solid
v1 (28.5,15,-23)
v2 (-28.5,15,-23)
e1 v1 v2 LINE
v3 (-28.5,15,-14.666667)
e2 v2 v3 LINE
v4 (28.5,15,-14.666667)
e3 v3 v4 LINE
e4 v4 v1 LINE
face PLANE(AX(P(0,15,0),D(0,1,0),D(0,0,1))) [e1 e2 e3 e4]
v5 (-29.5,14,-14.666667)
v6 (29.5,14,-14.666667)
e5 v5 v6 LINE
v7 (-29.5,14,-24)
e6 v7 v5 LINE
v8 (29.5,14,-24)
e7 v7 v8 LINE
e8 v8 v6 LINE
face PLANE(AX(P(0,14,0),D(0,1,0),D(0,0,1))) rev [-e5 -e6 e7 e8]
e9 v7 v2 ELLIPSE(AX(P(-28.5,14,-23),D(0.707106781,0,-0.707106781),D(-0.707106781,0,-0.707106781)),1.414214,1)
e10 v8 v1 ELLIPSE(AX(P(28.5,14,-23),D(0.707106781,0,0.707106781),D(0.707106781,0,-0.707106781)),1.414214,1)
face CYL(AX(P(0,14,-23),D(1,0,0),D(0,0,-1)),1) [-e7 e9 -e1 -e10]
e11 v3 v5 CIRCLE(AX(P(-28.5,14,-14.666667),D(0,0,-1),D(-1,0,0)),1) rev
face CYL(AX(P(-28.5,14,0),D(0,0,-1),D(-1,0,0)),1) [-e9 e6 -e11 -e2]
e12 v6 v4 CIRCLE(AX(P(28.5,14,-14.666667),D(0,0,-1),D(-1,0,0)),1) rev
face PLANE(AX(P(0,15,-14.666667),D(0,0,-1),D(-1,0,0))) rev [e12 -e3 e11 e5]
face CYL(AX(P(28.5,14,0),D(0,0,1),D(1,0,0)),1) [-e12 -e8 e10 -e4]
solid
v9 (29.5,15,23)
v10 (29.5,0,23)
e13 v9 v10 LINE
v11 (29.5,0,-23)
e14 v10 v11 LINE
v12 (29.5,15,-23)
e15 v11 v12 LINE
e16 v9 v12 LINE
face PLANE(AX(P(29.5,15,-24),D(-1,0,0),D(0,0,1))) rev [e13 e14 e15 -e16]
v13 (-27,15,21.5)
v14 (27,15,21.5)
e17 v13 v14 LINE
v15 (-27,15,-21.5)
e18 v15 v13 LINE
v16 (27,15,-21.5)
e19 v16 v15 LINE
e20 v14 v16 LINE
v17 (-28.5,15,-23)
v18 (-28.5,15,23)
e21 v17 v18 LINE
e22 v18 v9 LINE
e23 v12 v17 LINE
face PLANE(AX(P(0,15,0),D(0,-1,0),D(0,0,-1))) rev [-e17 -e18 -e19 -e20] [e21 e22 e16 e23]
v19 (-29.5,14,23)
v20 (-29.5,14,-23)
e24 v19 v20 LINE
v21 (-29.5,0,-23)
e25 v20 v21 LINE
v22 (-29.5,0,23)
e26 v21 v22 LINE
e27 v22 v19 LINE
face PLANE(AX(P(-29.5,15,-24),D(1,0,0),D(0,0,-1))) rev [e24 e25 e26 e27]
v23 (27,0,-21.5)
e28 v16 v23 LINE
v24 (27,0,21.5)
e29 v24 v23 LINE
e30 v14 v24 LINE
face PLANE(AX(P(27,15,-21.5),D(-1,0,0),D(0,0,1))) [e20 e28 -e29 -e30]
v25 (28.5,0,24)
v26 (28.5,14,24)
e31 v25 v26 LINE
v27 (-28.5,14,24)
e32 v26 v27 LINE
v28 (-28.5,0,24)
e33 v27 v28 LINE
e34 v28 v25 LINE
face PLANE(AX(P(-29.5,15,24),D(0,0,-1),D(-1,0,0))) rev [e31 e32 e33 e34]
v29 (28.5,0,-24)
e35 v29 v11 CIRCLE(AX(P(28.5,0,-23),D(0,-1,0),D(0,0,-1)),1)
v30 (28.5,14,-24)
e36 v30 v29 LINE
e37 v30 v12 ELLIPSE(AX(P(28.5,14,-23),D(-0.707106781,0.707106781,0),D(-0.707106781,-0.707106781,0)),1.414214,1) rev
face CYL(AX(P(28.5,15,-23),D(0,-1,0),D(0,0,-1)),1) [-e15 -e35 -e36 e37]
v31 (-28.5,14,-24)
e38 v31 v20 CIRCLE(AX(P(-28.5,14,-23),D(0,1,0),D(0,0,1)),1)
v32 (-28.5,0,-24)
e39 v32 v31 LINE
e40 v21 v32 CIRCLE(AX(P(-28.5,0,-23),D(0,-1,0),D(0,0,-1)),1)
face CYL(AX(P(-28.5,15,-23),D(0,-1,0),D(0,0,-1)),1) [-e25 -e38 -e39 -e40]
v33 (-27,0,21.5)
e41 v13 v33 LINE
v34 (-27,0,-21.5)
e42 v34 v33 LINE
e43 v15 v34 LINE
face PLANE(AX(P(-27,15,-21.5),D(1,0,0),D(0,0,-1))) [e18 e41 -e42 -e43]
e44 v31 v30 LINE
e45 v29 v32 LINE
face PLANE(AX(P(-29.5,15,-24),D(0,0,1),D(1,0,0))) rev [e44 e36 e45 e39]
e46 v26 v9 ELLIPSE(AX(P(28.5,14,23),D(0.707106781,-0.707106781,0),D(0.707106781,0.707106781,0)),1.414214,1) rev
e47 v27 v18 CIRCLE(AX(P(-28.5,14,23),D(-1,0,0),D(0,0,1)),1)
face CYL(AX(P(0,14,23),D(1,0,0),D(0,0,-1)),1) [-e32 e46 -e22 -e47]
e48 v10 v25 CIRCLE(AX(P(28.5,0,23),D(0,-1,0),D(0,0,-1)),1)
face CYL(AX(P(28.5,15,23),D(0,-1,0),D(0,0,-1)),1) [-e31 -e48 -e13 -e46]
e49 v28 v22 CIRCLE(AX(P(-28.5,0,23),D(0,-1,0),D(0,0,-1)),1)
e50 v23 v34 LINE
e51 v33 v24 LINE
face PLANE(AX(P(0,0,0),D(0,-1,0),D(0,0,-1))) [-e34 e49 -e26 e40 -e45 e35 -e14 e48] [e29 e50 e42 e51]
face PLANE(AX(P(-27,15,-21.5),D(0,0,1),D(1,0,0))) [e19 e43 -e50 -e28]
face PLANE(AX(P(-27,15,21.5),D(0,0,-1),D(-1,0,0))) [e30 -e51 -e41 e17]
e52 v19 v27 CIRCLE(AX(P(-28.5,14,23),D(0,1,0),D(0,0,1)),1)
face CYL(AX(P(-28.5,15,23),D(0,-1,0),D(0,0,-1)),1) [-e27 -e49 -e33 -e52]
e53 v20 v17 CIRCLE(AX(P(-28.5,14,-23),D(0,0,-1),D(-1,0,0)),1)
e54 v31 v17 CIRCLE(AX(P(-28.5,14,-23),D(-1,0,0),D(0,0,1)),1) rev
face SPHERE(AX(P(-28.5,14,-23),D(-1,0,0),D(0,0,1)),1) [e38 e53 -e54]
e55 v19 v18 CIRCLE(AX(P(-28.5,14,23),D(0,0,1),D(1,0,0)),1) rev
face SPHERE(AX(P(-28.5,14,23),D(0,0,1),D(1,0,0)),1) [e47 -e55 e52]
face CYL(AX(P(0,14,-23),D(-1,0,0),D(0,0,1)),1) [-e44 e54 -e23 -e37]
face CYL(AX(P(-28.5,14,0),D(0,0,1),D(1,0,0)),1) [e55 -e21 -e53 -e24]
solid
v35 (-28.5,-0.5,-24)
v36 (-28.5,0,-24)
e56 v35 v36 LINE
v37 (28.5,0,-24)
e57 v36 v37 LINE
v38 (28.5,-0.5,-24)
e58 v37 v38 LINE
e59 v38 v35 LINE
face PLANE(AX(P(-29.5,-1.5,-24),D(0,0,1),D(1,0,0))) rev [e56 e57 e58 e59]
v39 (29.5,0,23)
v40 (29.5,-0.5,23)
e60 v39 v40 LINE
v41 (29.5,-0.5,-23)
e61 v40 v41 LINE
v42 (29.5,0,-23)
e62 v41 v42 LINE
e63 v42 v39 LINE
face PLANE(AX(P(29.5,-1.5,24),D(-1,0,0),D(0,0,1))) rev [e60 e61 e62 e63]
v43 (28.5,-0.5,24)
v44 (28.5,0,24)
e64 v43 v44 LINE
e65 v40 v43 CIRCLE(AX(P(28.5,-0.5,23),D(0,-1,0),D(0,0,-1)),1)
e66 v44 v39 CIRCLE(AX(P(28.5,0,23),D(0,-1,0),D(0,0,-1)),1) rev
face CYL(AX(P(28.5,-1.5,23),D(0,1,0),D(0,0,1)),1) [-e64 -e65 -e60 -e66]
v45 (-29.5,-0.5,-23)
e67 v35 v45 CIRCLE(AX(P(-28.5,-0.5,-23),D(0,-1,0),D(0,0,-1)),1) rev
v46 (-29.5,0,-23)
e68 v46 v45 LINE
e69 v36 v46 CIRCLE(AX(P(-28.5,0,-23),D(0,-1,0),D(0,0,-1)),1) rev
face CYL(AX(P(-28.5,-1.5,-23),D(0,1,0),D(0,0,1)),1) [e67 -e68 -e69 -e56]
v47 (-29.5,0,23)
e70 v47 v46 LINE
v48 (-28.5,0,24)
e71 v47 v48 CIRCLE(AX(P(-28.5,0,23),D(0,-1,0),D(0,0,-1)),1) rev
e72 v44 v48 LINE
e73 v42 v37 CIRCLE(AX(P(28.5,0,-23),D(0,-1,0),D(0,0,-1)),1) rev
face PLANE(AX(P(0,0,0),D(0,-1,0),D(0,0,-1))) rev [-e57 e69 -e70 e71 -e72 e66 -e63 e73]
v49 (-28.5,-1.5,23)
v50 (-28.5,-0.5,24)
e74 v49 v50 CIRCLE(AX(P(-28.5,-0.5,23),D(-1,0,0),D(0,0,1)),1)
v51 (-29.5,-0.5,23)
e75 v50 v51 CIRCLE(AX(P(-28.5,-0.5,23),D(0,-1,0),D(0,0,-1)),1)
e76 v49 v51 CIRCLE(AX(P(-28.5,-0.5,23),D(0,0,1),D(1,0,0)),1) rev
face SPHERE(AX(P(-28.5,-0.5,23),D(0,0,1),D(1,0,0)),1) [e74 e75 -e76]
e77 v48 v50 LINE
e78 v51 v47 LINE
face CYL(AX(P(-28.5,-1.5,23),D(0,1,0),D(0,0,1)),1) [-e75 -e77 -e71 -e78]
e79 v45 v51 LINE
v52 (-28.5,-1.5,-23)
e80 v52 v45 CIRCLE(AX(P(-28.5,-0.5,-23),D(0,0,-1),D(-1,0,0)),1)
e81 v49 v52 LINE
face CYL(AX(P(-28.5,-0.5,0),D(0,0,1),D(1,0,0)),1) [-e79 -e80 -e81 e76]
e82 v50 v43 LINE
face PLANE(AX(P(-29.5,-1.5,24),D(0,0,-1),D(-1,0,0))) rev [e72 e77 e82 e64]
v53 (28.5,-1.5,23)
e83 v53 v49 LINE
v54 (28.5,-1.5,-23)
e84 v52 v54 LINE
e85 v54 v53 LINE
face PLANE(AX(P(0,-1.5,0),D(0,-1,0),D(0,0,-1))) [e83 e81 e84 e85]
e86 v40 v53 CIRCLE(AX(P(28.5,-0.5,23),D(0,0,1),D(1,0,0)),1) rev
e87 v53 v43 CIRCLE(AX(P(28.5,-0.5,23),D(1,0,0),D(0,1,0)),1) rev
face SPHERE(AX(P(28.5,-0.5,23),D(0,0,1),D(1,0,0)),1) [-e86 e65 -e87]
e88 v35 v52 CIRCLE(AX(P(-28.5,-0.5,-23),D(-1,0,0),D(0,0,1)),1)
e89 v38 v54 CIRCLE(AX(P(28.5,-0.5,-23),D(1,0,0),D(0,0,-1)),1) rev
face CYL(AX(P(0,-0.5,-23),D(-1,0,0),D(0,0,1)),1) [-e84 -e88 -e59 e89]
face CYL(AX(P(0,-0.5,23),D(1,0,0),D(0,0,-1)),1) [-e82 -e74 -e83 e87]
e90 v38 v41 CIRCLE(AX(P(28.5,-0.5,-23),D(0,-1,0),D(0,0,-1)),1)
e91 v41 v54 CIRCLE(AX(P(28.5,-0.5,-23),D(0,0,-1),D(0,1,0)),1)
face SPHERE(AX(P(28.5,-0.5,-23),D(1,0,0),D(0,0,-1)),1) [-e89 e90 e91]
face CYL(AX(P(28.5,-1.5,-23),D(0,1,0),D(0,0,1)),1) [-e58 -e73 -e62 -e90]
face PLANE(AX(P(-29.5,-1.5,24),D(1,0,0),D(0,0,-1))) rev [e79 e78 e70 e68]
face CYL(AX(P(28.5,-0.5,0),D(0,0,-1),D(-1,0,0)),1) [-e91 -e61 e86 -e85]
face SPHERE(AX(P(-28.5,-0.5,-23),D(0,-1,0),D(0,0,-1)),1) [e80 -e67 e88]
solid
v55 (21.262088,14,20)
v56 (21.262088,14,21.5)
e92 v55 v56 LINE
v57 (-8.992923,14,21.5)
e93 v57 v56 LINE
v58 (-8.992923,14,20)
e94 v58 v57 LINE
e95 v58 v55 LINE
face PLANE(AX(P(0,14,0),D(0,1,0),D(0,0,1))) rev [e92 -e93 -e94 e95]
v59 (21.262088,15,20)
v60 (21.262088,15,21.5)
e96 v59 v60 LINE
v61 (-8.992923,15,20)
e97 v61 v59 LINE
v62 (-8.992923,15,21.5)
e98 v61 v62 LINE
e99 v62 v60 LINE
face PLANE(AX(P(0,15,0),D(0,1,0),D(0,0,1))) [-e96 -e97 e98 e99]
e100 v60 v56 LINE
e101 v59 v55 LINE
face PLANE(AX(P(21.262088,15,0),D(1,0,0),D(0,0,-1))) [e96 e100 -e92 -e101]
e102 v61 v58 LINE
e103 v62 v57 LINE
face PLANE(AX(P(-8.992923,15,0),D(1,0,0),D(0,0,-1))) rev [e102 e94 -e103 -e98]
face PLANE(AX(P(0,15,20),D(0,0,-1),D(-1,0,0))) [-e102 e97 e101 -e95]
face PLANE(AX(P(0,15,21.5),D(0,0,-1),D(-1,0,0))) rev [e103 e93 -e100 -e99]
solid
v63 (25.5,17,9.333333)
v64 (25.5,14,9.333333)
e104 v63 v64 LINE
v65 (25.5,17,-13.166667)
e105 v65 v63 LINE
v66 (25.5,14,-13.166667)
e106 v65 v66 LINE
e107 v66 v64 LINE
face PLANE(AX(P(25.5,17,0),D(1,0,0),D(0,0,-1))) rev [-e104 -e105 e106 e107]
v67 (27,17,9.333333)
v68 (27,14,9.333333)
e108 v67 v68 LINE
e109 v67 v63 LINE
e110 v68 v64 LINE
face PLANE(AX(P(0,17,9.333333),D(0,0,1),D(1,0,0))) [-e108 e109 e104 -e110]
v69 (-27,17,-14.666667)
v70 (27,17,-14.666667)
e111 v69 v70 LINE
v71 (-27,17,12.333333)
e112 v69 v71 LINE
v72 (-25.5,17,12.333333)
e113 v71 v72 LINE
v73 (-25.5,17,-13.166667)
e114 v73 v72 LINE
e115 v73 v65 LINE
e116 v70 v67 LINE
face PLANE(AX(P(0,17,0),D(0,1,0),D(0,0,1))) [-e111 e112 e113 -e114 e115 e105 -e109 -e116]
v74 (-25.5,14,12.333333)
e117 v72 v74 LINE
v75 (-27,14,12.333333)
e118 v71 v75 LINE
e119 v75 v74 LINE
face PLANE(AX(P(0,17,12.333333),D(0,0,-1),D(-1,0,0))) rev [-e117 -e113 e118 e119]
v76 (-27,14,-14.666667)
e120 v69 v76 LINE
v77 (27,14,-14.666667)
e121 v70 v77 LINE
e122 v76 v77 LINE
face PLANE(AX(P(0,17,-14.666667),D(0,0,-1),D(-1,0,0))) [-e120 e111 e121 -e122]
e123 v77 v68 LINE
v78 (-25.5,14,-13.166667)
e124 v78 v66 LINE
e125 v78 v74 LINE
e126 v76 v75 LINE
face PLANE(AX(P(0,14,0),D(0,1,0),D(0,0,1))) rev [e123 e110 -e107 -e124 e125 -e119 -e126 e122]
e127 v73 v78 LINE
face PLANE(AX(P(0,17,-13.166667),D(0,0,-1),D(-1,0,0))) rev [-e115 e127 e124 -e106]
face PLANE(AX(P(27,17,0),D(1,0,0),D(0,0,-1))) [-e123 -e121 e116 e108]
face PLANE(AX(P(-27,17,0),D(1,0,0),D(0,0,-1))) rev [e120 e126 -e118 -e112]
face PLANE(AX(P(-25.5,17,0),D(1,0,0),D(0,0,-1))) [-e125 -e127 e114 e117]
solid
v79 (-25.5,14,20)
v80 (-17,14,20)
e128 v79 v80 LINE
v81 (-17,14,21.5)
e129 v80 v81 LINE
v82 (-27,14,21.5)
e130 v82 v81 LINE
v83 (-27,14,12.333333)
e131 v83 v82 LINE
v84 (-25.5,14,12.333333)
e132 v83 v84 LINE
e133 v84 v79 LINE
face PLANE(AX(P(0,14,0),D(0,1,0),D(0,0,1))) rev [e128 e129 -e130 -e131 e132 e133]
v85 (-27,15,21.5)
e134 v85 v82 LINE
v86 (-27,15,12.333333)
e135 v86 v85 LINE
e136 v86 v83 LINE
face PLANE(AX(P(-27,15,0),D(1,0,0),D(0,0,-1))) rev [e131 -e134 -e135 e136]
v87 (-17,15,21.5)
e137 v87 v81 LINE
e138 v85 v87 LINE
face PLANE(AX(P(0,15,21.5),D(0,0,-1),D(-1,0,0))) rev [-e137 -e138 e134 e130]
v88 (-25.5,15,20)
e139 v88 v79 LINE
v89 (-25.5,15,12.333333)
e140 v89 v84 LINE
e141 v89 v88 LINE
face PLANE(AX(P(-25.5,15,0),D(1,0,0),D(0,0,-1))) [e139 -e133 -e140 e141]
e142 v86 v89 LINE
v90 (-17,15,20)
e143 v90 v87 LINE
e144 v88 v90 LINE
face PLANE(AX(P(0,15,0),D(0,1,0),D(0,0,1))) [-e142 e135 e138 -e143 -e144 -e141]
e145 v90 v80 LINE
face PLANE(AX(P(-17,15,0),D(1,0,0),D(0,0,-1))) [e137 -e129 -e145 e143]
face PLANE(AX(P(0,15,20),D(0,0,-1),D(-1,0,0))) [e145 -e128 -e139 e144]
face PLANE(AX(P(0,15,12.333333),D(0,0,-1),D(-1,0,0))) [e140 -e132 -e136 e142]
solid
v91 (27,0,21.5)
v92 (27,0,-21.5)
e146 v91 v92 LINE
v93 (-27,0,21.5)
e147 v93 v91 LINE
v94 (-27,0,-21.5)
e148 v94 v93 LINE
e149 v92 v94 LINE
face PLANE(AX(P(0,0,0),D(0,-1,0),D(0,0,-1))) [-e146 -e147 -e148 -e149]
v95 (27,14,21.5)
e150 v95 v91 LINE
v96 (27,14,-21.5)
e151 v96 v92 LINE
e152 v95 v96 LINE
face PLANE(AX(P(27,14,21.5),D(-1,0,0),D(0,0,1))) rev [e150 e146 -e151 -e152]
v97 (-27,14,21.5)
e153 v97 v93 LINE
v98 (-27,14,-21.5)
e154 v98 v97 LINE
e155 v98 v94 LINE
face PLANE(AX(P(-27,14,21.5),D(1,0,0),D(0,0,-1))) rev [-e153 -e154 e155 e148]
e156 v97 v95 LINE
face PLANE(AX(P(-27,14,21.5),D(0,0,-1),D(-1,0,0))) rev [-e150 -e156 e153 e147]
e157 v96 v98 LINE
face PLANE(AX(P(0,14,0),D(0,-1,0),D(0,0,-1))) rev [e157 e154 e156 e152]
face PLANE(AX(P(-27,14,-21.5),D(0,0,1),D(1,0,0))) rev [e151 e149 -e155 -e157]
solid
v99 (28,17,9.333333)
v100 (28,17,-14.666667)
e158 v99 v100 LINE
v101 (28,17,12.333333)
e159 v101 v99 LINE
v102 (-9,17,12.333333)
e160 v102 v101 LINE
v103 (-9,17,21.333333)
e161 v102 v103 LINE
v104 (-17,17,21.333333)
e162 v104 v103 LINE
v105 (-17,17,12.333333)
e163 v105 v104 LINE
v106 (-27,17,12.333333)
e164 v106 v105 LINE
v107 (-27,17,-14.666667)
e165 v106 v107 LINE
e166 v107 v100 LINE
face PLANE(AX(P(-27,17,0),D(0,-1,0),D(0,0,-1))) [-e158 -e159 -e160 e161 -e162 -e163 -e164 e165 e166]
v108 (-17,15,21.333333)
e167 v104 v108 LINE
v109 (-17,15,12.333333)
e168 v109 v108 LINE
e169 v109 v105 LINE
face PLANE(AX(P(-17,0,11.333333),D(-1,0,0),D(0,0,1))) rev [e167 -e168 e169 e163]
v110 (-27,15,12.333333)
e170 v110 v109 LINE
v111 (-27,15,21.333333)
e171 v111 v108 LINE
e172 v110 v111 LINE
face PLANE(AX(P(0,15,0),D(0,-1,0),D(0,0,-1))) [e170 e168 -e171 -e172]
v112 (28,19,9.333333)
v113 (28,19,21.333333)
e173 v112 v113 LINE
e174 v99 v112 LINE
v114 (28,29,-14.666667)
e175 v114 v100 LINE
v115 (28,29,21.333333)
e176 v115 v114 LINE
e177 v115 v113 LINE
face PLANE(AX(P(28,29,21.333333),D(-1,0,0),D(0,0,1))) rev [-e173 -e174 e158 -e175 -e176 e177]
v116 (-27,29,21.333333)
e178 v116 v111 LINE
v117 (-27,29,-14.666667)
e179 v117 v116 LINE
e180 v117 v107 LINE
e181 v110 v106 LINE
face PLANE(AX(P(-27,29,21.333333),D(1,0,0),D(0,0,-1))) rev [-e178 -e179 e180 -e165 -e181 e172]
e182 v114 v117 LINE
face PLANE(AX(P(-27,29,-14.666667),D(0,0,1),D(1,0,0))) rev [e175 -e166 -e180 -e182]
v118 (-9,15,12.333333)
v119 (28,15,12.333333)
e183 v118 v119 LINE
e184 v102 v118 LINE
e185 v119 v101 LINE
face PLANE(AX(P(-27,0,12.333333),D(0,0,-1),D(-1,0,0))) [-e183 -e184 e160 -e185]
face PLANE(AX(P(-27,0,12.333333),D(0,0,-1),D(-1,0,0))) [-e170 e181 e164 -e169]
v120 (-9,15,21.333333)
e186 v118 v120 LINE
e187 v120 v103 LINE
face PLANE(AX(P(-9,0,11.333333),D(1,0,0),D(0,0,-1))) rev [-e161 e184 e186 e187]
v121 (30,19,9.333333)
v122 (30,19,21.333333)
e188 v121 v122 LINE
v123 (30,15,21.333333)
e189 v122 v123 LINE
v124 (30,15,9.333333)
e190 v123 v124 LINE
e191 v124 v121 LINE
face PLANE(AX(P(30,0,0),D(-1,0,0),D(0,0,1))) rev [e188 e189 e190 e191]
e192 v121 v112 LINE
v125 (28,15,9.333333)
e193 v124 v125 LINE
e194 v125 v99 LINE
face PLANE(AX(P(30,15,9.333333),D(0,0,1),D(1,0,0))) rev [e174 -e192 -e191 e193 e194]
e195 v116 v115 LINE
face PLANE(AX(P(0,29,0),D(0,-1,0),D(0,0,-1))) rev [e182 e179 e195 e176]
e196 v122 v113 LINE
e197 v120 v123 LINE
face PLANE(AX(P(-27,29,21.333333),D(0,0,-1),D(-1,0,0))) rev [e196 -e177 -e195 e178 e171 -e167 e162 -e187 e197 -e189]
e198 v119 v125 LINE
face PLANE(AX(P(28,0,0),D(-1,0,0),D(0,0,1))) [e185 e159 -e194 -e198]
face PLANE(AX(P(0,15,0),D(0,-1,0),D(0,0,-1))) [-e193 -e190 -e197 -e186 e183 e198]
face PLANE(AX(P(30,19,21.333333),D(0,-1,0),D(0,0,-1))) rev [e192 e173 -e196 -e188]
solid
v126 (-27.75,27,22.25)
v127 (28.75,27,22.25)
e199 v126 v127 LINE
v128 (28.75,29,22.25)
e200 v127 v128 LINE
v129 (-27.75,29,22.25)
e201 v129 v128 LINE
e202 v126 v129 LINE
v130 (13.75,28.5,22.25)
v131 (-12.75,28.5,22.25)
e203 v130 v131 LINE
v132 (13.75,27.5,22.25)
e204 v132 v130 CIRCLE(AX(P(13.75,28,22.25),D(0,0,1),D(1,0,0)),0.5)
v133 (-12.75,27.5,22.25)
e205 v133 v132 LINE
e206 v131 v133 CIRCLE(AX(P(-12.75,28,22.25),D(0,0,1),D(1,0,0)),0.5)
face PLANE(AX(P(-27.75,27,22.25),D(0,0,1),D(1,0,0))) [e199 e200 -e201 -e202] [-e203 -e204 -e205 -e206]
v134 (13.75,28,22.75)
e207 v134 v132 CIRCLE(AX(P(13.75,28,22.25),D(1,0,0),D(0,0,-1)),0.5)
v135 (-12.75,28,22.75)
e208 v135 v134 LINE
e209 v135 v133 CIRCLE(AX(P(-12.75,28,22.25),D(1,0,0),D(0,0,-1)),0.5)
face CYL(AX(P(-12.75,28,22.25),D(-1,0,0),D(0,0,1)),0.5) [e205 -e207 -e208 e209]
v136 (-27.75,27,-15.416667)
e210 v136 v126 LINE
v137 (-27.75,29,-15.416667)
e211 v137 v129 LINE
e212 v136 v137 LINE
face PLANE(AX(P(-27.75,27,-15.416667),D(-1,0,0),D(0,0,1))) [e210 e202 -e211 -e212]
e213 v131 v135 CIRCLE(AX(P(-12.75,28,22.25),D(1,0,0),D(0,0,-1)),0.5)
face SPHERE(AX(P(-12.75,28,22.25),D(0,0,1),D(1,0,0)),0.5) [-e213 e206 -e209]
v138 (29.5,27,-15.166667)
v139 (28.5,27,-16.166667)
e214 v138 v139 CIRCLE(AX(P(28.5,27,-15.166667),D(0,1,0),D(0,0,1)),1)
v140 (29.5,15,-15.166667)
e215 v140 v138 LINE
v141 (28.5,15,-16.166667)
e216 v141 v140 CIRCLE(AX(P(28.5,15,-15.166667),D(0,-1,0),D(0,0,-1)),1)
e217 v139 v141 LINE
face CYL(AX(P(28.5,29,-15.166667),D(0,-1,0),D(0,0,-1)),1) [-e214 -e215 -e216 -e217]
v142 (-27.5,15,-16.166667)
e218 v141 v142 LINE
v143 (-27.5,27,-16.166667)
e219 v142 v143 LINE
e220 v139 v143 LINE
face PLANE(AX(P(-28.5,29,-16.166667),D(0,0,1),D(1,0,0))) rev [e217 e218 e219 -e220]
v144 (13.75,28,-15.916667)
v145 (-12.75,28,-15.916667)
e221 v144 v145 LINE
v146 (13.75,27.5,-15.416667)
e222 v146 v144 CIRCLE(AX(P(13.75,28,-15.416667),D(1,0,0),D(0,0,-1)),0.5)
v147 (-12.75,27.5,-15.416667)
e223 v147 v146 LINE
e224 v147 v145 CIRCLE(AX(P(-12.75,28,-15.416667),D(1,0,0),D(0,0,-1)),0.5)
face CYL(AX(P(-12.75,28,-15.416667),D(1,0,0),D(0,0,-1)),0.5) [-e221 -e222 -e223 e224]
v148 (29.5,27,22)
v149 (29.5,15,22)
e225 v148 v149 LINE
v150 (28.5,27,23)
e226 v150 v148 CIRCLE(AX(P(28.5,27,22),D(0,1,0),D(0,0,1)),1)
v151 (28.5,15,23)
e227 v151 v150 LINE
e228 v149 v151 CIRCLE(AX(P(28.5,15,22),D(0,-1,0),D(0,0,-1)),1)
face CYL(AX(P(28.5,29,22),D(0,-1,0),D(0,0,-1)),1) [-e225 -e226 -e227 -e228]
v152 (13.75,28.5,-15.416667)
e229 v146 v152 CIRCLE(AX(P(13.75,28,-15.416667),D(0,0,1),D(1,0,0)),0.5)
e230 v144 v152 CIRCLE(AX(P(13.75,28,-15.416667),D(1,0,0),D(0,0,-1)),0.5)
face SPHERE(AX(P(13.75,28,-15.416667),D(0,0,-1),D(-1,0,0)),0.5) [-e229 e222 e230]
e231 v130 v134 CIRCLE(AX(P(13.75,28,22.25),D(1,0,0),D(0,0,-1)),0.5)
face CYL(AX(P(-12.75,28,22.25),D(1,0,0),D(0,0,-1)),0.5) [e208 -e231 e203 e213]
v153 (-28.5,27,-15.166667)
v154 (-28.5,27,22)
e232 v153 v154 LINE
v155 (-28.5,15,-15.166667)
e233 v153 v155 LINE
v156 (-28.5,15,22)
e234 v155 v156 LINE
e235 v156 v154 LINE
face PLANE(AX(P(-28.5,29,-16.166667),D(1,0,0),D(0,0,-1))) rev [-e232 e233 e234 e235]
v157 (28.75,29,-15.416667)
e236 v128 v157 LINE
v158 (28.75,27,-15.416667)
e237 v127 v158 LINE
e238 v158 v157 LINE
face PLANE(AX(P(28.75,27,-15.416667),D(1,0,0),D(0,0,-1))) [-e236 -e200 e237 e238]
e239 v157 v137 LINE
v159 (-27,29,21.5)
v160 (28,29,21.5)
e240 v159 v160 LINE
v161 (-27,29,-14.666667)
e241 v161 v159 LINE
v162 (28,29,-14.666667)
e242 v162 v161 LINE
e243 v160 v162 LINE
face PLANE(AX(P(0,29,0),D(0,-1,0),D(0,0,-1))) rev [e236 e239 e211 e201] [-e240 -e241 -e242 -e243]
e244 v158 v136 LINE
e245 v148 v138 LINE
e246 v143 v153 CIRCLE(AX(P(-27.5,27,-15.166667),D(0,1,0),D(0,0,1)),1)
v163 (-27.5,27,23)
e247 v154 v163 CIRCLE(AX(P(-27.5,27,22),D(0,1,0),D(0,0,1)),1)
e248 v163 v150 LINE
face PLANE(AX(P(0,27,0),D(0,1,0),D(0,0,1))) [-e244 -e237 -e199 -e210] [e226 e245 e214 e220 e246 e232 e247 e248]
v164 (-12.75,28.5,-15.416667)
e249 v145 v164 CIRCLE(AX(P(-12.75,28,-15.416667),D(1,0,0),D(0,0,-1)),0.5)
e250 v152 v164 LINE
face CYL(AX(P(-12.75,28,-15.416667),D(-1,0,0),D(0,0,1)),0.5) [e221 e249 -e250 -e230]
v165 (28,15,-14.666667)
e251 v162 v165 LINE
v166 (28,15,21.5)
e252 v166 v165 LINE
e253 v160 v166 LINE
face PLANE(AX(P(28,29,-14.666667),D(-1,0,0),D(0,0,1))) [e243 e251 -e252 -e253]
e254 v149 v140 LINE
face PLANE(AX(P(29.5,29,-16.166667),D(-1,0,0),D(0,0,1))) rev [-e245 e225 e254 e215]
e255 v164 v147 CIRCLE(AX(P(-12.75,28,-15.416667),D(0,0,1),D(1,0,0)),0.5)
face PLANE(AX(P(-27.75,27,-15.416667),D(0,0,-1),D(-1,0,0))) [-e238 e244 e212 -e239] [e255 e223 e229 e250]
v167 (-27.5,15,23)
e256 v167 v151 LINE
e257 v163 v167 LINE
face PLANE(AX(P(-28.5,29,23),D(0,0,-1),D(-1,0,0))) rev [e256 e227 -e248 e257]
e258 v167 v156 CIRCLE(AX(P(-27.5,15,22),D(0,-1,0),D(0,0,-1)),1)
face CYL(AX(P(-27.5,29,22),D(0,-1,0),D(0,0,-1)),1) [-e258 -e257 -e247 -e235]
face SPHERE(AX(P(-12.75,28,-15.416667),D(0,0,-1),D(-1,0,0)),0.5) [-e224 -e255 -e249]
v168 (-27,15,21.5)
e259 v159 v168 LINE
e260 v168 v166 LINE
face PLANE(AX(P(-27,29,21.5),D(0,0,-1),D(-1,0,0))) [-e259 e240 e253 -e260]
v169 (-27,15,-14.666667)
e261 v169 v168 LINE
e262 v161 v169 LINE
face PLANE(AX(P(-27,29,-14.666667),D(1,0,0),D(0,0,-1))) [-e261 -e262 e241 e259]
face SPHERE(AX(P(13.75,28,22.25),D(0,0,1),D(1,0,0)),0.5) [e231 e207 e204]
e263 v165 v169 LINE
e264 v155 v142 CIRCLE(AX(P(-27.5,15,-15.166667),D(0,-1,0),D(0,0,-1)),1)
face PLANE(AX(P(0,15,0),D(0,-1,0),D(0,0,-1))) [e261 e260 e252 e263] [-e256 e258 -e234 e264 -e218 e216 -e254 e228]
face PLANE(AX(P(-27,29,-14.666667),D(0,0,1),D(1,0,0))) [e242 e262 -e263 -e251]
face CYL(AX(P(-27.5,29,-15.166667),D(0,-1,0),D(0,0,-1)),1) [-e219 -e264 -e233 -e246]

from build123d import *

# Parameters (mm, degrees)
SKETCH2_W                        = 54
SKETCH2_H                        = 43
BOSS_EXTRUDE1_BATTERY_DEPTH      = 14
SKETCH4_W                        = 55
SKETCH4_H                        = 36
BOSS_EXTRUDE2_CIRCUIT_DEPTH      = 14
SKETCH11_W                       = 27
SKETCH11_H                       = 2
CUT_EXTRUDE2_CUTPINS_DEPTH       = 55
SKETCH12_W                       = 12
SKETCH12_H                       = 4
BOSS_EXTRUDE1_BATTERYCON_DEPTH   = 2
SKETCH8_W                        = 8
SKETCH8_H                        = 2
CUT_EXTRUDE3_SWITCHCONNGAP_DEPTH = 10
SKETCH13_W                       = 59
SKETCH13_H                       = 48
SKETCH13_W_2                     = 54
SKETCH13_H_2                     = 43
BOSS_EXTRUDE4_DEPTH              = 15
BOSS_EXTRUDE6_DEPTH              = 3
BOSS_EXTRUDE7_DEPTH              = 1
SKETCH14_6_W                     = 30.255010682
SKETCH14_6_H                     = 1.5
BOSS_EXTRUDE7_2_DEPTH            = 1
BOSS_EXTRUDE9_DEPTH              = 1
SKETCH15_W                       = 58
SKETCH15_H                       = 39.166666667
SKETCH15_W_2                     = 55
SKETCH15_H_2                     = 36.166666667
BOSS_EXTRUDE10_DEPTH             = 14
SKETCH16_W                       = 58
SKETCH16_H                       = 39.166666667
SKETCH16_W_2                     = 56.5
SKETCH16_H_2                     = 37.666666667
CUT_EXTRUDE_LIDCUT_DEPTH         = 2
BOSS_EXTRUDE11_DEPTH             = 0.5
FILLET5_R                        = 0.5
FILLET5_OF_MIRROR1_R             = 0.5
SKETCH18_W                       = 59
SKETCH18_H                       = 48
BOSS_EXTRUDE13_DEPTH             = 1.5
FILLET6_R                        = 1
FILLET7_R                        = 1
FILLET8_R                        = 1
FILLET9_R                        = 1


with BuildPart() as part:
    # Sketch2 → Boss-Extrude1-Battery (new body)
    with BuildSketch(Plane(origin=(0, 0, 0), x_dir=(1, 0, 0), z_dir=(0, 1, 0))):
        Rectangle(SKETCH2_W, SKETCH2_H)
    extrude(amount=BOSS_EXTRUDE1_BATTERY_DEPTH)


with BuildPart() as body_2:
    # Sketch4 → Boss-Extrude2-Circuit (new body)
    with BuildSketch(Plane(origin=(0, 15, 0), x_dir=(1, 0, 0), z_dir=(0, 1, 0))):
        with Locations((0.5, -3.333333333)):
            Rectangle(SKETCH4_W, SKETCH4_H)
    extrude(amount=BOSS_EXTRUDE2_CIRCUIT_DEPTH)

    # Sketch11 → Cut-Extrude2-CutPins (cut)
    with BuildSketch(Plane(origin=(28, 0, 0), x_dir=(0, 0, -1), z_dir=(1, 0, 0))):
        with Locations((1.166666667, 16)):
            Rectangle(SKETCH11_W, SKETCH11_H)
    extrude(amount=-CUT_EXTRUDE2_CUTPINS_DEPTH, mode=Mode.SUBTRACT)

    # Sketch12 → Boss-Extrude1-BatteryCon (add)
    with BuildSketch(Plane(origin=(28, 0, 0), x_dir=(0, 0, -1), z_dir=(1, 0, 0))):
        with Locations((-15.333333333, 17)):
            Rectangle(SKETCH12_W, SKETCH12_H)
    extrude(amount=BOSS_EXTRUDE1_BATTERYCON_DEPTH)

    # Sketch8 → Cut-Extrude3-SwitchConnGap (cut)
    with BuildSketch(Plane.XY.offset(21.333333333)):
        with Locations((-13, 16)):
            Rectangle(SKETCH8_W, SKETCH8_H)
    extrude(amount=-CUT_EXTRUDE3_SWITCHCONNGAP_DEPTH, mode=Mode.SUBTRACT)


with BuildPart() as body_3:
    # Sketch13 → Boss-Extrude4 (new body)
    with BuildSketch(Plane(origin=(0, 0, 0), x_dir=(1, 0, 0), z_dir=(0, 1, 0))):
        Rectangle(SKETCH13_W, SKETCH13_H)
        Rectangle(SKETCH13_W_2, SKETCH13_H_2, mode=Mode.SUBTRACT)
    extrude(amount=BOSS_EXTRUDE4_DEPTH)

    # Fillet6
    fillet6_edges = [body_3.edges().sort_by_distance(p)[0] for p in [
        (0, 15, 24),
        (0, 15, -24),
        (29.5, 7.5, -24),
        (29.5, 7.5, 24),
        (-29.5, 7.5, 24),
        (-29.5, 7.5, -24),
        (-29.5, 15, 0),
    ]]
    fillet(fillet6_edges, radius=FILLET6_R)


with BuildPart() as body_4:
    # Sketch14 → Boss-Extrude6 (new body)
    with BuildSketch(Plane(origin=(0, 14, 0), x_dir=(1, 0, 0), z_dir=(0, 1, 0))):
        Polygon((-25.5, -12.333333333), (-25.5, 13.166666667), (25.5, 13.166666667), (25.5, -9.333333333), (27, -9.333333333), (27, 14.666666667), (-27, 14.666666667), (-27, -12.333333333), align=None)
    extrude(amount=BOSS_EXTRUDE6_DEPTH)


with BuildPart() as body_5:
    # Sketch14<6> → Boss-Extrude7 (new body)
    with BuildSketch(Plane(origin=(0, 14, 0), x_dir=(1, 0, 0), z_dir=(0, 1, 0))):
        Polygon((-25.5, -20), (-25.5, -12.333333333), (-27, -12.333333333), (-27, -21.5), (-17, -21.5), (-17, -20), align=None)
    extrude(amount=BOSS_EXTRUDE7_DEPTH)


with BuildPart() as body_6:
    # Sketch14<6> → Boss-Extrude7 2 (new body)
    with BuildSketch(Plane(origin=(0, 14, 0), x_dir=(1, 0, 0), z_dir=(0, 1, 0))):
        with Locations((6.134582559, -20.75)):
            Rectangle(SKETCH14_6_W, SKETCH14_6_H)
    extrude(amount=BOSS_EXTRUDE7_2_DEPTH)


with BuildPart() as body_7:
    # Sketch14<7> → Boss-Extrude9 (new body)
    with BuildSketch(Plane(origin=(0, 14, 0), x_dir=(1, 0, 0), z_dir=(0, 1, 0))):
        Polygon((-29.5, 14.666666667), (-27, 14.666666667), (27, 14.666666667), (29.5, 14.666666667), (29.5, 24), (-29.5, 24), align=None)
    extrude(amount=BOSS_EXTRUDE9_DEPTH)

    # Fillet7
    fillet7_edges = [body_7.edges().sort_by_distance(p)[0] for p in [
        (29.5, 15, -19.333333333),
        (0, 15, -24),
        (-29.5, 15, -19.333333333),
    ]]
    fillet(fillet7_edges, radius=FILLET7_R - 0.0001)  # a hair under: the kernel refuses the full size


with BuildPart() as body_8:
    # Sketch15 → Boss-Extrude10 (new body)
    with BuildSketch(Plane(origin=(0, 15, 0), x_dir=(1, 0, 0), z_dir=(0, 1, 0))):
        with Locations((0.5, -3.416666666)):
            Rectangle(SKETCH15_W, SKETCH15_H)
        with Locations((0.5, -3.416666666)):
            Rectangle(SKETCH15_W_2, SKETCH15_H_2, mode=Mode.SUBTRACT)
    extrude(amount=BOSS_EXTRUDE10_DEPTH)

    # Sketch16 → Cut-Extrude-LidCut (cut)
    with BuildSketch(Plane(origin=(0, 29, 0), x_dir=(1, 0, 0), z_dir=(0, 1, 0))):
        with Locations((0.5, -3.416666666)):
            Rectangle(SKETCH16_W, SKETCH16_H)
        with Locations((0.5, -3.416666666)):
            Rectangle(SKETCH16_W_2, SKETCH16_H_2, mode=Mode.SUBTRACT)
    extrude(amount=-CUT_EXTRUDE_LIDCUT_DEPTH, mode=Mode.SUBTRACT)

    # Sketch17 → Boss-Extrude11 (add)
    with BuildSketch(Plane.XY.offset(22.25)):
        with BuildLine():
            Line((-12.75, 28.5), (13.75, 28.5))
            ThreePointArc((13.75, 28.5), (14.25, 28), (13.75, 27.5))
            Line((13.75, 27.5), (-12.75, 27.5))
            ThreePointArc((-12.75, 27.5), (-13.25, 28), (-12.75, 28.5))
        make_face()
    boss_extrude11 = extrude(amount=BOSS_EXTRUDE11_DEPTH)

    # Fillet5
    fillet5_edges = [body_8.edges().sort_by_distance(p)[0] for p in [
        (14.25, 28, 22.75),
        (-13.25, 28, 22.75),
        (0.5, 27.5, 22.75),
        (0.5, 28.5, 22.75),
    ]]
    fillet(fillet5_edges, radius=FILLET5_R - 0.0001)  # a hair under: the kernel refuses the full size

    # Mirror1: Boss-Extrude11 across plane
    add(boss_extrude11.mirror(Plane(origin=(0, 0, 3.416666667), x_dir=(1, 0, 0), z_dir=(0, 0, -1))))

    # Fillet5 of Mirror1
    fillet5_of_mirror1_edges = [body_8.edges().sort_by_distance(p)[0] for p in [
        (14.25, 28, -15.916666667),
        (-13.25, 28, -15.916666667),
        (0.5, 27.5, -15.916666667),
        (0.5, 28.5, -15.916666667),
    ]]
    fillet(fillet5_of_mirror1_edges, radius=FILLET5_OF_MIRROR1_R - 0.0001)  # a hair under: the kernel refuses the full size

    # Fillet8
    fillet8_edges = [body_8.edges().sort_by_distance(p)[0] for p in [
        (29.5, 21, -16.166666667),
        (29.5, 21, 23),
        (-28.5, 21, 23),
        (-28.5, 21, -16.166666667),
    ]]
    fillet(fillet8_edges, radius=FILLET8_R)


with BuildPart() as body_9:
    # Sketch18 → Boss-Extrude13 (new body)
    with BuildSketch(Plane.XZ):
        Rectangle(SKETCH18_W, SKETCH18_H)
    extrude(amount=BOSS_EXTRUDE13_DEPTH)

    # Fillet9
    fillet9_edges = [body_9.edges().sort_by_distance(p)[0] for p in [
        (29.5, -1.5, 0),
        (0, -1.5, 24),
        (-29.5, -1.5, 0),
        (-29.5, -0.75, 24),
        (29.5, -0.75, 24),
        (29.5, -0.75, -24),
        (-29.5, -0.75, -24),
        (0, -1.5, -24),
    ]]
    fillet(fillet9_edges, radius=FILLET9_R)


solid = Compound([part.part, body_2.part, body_3.part, body_4.part, body_5.part, body_6.part, body_7.part, body_8.part, body_9.part])
